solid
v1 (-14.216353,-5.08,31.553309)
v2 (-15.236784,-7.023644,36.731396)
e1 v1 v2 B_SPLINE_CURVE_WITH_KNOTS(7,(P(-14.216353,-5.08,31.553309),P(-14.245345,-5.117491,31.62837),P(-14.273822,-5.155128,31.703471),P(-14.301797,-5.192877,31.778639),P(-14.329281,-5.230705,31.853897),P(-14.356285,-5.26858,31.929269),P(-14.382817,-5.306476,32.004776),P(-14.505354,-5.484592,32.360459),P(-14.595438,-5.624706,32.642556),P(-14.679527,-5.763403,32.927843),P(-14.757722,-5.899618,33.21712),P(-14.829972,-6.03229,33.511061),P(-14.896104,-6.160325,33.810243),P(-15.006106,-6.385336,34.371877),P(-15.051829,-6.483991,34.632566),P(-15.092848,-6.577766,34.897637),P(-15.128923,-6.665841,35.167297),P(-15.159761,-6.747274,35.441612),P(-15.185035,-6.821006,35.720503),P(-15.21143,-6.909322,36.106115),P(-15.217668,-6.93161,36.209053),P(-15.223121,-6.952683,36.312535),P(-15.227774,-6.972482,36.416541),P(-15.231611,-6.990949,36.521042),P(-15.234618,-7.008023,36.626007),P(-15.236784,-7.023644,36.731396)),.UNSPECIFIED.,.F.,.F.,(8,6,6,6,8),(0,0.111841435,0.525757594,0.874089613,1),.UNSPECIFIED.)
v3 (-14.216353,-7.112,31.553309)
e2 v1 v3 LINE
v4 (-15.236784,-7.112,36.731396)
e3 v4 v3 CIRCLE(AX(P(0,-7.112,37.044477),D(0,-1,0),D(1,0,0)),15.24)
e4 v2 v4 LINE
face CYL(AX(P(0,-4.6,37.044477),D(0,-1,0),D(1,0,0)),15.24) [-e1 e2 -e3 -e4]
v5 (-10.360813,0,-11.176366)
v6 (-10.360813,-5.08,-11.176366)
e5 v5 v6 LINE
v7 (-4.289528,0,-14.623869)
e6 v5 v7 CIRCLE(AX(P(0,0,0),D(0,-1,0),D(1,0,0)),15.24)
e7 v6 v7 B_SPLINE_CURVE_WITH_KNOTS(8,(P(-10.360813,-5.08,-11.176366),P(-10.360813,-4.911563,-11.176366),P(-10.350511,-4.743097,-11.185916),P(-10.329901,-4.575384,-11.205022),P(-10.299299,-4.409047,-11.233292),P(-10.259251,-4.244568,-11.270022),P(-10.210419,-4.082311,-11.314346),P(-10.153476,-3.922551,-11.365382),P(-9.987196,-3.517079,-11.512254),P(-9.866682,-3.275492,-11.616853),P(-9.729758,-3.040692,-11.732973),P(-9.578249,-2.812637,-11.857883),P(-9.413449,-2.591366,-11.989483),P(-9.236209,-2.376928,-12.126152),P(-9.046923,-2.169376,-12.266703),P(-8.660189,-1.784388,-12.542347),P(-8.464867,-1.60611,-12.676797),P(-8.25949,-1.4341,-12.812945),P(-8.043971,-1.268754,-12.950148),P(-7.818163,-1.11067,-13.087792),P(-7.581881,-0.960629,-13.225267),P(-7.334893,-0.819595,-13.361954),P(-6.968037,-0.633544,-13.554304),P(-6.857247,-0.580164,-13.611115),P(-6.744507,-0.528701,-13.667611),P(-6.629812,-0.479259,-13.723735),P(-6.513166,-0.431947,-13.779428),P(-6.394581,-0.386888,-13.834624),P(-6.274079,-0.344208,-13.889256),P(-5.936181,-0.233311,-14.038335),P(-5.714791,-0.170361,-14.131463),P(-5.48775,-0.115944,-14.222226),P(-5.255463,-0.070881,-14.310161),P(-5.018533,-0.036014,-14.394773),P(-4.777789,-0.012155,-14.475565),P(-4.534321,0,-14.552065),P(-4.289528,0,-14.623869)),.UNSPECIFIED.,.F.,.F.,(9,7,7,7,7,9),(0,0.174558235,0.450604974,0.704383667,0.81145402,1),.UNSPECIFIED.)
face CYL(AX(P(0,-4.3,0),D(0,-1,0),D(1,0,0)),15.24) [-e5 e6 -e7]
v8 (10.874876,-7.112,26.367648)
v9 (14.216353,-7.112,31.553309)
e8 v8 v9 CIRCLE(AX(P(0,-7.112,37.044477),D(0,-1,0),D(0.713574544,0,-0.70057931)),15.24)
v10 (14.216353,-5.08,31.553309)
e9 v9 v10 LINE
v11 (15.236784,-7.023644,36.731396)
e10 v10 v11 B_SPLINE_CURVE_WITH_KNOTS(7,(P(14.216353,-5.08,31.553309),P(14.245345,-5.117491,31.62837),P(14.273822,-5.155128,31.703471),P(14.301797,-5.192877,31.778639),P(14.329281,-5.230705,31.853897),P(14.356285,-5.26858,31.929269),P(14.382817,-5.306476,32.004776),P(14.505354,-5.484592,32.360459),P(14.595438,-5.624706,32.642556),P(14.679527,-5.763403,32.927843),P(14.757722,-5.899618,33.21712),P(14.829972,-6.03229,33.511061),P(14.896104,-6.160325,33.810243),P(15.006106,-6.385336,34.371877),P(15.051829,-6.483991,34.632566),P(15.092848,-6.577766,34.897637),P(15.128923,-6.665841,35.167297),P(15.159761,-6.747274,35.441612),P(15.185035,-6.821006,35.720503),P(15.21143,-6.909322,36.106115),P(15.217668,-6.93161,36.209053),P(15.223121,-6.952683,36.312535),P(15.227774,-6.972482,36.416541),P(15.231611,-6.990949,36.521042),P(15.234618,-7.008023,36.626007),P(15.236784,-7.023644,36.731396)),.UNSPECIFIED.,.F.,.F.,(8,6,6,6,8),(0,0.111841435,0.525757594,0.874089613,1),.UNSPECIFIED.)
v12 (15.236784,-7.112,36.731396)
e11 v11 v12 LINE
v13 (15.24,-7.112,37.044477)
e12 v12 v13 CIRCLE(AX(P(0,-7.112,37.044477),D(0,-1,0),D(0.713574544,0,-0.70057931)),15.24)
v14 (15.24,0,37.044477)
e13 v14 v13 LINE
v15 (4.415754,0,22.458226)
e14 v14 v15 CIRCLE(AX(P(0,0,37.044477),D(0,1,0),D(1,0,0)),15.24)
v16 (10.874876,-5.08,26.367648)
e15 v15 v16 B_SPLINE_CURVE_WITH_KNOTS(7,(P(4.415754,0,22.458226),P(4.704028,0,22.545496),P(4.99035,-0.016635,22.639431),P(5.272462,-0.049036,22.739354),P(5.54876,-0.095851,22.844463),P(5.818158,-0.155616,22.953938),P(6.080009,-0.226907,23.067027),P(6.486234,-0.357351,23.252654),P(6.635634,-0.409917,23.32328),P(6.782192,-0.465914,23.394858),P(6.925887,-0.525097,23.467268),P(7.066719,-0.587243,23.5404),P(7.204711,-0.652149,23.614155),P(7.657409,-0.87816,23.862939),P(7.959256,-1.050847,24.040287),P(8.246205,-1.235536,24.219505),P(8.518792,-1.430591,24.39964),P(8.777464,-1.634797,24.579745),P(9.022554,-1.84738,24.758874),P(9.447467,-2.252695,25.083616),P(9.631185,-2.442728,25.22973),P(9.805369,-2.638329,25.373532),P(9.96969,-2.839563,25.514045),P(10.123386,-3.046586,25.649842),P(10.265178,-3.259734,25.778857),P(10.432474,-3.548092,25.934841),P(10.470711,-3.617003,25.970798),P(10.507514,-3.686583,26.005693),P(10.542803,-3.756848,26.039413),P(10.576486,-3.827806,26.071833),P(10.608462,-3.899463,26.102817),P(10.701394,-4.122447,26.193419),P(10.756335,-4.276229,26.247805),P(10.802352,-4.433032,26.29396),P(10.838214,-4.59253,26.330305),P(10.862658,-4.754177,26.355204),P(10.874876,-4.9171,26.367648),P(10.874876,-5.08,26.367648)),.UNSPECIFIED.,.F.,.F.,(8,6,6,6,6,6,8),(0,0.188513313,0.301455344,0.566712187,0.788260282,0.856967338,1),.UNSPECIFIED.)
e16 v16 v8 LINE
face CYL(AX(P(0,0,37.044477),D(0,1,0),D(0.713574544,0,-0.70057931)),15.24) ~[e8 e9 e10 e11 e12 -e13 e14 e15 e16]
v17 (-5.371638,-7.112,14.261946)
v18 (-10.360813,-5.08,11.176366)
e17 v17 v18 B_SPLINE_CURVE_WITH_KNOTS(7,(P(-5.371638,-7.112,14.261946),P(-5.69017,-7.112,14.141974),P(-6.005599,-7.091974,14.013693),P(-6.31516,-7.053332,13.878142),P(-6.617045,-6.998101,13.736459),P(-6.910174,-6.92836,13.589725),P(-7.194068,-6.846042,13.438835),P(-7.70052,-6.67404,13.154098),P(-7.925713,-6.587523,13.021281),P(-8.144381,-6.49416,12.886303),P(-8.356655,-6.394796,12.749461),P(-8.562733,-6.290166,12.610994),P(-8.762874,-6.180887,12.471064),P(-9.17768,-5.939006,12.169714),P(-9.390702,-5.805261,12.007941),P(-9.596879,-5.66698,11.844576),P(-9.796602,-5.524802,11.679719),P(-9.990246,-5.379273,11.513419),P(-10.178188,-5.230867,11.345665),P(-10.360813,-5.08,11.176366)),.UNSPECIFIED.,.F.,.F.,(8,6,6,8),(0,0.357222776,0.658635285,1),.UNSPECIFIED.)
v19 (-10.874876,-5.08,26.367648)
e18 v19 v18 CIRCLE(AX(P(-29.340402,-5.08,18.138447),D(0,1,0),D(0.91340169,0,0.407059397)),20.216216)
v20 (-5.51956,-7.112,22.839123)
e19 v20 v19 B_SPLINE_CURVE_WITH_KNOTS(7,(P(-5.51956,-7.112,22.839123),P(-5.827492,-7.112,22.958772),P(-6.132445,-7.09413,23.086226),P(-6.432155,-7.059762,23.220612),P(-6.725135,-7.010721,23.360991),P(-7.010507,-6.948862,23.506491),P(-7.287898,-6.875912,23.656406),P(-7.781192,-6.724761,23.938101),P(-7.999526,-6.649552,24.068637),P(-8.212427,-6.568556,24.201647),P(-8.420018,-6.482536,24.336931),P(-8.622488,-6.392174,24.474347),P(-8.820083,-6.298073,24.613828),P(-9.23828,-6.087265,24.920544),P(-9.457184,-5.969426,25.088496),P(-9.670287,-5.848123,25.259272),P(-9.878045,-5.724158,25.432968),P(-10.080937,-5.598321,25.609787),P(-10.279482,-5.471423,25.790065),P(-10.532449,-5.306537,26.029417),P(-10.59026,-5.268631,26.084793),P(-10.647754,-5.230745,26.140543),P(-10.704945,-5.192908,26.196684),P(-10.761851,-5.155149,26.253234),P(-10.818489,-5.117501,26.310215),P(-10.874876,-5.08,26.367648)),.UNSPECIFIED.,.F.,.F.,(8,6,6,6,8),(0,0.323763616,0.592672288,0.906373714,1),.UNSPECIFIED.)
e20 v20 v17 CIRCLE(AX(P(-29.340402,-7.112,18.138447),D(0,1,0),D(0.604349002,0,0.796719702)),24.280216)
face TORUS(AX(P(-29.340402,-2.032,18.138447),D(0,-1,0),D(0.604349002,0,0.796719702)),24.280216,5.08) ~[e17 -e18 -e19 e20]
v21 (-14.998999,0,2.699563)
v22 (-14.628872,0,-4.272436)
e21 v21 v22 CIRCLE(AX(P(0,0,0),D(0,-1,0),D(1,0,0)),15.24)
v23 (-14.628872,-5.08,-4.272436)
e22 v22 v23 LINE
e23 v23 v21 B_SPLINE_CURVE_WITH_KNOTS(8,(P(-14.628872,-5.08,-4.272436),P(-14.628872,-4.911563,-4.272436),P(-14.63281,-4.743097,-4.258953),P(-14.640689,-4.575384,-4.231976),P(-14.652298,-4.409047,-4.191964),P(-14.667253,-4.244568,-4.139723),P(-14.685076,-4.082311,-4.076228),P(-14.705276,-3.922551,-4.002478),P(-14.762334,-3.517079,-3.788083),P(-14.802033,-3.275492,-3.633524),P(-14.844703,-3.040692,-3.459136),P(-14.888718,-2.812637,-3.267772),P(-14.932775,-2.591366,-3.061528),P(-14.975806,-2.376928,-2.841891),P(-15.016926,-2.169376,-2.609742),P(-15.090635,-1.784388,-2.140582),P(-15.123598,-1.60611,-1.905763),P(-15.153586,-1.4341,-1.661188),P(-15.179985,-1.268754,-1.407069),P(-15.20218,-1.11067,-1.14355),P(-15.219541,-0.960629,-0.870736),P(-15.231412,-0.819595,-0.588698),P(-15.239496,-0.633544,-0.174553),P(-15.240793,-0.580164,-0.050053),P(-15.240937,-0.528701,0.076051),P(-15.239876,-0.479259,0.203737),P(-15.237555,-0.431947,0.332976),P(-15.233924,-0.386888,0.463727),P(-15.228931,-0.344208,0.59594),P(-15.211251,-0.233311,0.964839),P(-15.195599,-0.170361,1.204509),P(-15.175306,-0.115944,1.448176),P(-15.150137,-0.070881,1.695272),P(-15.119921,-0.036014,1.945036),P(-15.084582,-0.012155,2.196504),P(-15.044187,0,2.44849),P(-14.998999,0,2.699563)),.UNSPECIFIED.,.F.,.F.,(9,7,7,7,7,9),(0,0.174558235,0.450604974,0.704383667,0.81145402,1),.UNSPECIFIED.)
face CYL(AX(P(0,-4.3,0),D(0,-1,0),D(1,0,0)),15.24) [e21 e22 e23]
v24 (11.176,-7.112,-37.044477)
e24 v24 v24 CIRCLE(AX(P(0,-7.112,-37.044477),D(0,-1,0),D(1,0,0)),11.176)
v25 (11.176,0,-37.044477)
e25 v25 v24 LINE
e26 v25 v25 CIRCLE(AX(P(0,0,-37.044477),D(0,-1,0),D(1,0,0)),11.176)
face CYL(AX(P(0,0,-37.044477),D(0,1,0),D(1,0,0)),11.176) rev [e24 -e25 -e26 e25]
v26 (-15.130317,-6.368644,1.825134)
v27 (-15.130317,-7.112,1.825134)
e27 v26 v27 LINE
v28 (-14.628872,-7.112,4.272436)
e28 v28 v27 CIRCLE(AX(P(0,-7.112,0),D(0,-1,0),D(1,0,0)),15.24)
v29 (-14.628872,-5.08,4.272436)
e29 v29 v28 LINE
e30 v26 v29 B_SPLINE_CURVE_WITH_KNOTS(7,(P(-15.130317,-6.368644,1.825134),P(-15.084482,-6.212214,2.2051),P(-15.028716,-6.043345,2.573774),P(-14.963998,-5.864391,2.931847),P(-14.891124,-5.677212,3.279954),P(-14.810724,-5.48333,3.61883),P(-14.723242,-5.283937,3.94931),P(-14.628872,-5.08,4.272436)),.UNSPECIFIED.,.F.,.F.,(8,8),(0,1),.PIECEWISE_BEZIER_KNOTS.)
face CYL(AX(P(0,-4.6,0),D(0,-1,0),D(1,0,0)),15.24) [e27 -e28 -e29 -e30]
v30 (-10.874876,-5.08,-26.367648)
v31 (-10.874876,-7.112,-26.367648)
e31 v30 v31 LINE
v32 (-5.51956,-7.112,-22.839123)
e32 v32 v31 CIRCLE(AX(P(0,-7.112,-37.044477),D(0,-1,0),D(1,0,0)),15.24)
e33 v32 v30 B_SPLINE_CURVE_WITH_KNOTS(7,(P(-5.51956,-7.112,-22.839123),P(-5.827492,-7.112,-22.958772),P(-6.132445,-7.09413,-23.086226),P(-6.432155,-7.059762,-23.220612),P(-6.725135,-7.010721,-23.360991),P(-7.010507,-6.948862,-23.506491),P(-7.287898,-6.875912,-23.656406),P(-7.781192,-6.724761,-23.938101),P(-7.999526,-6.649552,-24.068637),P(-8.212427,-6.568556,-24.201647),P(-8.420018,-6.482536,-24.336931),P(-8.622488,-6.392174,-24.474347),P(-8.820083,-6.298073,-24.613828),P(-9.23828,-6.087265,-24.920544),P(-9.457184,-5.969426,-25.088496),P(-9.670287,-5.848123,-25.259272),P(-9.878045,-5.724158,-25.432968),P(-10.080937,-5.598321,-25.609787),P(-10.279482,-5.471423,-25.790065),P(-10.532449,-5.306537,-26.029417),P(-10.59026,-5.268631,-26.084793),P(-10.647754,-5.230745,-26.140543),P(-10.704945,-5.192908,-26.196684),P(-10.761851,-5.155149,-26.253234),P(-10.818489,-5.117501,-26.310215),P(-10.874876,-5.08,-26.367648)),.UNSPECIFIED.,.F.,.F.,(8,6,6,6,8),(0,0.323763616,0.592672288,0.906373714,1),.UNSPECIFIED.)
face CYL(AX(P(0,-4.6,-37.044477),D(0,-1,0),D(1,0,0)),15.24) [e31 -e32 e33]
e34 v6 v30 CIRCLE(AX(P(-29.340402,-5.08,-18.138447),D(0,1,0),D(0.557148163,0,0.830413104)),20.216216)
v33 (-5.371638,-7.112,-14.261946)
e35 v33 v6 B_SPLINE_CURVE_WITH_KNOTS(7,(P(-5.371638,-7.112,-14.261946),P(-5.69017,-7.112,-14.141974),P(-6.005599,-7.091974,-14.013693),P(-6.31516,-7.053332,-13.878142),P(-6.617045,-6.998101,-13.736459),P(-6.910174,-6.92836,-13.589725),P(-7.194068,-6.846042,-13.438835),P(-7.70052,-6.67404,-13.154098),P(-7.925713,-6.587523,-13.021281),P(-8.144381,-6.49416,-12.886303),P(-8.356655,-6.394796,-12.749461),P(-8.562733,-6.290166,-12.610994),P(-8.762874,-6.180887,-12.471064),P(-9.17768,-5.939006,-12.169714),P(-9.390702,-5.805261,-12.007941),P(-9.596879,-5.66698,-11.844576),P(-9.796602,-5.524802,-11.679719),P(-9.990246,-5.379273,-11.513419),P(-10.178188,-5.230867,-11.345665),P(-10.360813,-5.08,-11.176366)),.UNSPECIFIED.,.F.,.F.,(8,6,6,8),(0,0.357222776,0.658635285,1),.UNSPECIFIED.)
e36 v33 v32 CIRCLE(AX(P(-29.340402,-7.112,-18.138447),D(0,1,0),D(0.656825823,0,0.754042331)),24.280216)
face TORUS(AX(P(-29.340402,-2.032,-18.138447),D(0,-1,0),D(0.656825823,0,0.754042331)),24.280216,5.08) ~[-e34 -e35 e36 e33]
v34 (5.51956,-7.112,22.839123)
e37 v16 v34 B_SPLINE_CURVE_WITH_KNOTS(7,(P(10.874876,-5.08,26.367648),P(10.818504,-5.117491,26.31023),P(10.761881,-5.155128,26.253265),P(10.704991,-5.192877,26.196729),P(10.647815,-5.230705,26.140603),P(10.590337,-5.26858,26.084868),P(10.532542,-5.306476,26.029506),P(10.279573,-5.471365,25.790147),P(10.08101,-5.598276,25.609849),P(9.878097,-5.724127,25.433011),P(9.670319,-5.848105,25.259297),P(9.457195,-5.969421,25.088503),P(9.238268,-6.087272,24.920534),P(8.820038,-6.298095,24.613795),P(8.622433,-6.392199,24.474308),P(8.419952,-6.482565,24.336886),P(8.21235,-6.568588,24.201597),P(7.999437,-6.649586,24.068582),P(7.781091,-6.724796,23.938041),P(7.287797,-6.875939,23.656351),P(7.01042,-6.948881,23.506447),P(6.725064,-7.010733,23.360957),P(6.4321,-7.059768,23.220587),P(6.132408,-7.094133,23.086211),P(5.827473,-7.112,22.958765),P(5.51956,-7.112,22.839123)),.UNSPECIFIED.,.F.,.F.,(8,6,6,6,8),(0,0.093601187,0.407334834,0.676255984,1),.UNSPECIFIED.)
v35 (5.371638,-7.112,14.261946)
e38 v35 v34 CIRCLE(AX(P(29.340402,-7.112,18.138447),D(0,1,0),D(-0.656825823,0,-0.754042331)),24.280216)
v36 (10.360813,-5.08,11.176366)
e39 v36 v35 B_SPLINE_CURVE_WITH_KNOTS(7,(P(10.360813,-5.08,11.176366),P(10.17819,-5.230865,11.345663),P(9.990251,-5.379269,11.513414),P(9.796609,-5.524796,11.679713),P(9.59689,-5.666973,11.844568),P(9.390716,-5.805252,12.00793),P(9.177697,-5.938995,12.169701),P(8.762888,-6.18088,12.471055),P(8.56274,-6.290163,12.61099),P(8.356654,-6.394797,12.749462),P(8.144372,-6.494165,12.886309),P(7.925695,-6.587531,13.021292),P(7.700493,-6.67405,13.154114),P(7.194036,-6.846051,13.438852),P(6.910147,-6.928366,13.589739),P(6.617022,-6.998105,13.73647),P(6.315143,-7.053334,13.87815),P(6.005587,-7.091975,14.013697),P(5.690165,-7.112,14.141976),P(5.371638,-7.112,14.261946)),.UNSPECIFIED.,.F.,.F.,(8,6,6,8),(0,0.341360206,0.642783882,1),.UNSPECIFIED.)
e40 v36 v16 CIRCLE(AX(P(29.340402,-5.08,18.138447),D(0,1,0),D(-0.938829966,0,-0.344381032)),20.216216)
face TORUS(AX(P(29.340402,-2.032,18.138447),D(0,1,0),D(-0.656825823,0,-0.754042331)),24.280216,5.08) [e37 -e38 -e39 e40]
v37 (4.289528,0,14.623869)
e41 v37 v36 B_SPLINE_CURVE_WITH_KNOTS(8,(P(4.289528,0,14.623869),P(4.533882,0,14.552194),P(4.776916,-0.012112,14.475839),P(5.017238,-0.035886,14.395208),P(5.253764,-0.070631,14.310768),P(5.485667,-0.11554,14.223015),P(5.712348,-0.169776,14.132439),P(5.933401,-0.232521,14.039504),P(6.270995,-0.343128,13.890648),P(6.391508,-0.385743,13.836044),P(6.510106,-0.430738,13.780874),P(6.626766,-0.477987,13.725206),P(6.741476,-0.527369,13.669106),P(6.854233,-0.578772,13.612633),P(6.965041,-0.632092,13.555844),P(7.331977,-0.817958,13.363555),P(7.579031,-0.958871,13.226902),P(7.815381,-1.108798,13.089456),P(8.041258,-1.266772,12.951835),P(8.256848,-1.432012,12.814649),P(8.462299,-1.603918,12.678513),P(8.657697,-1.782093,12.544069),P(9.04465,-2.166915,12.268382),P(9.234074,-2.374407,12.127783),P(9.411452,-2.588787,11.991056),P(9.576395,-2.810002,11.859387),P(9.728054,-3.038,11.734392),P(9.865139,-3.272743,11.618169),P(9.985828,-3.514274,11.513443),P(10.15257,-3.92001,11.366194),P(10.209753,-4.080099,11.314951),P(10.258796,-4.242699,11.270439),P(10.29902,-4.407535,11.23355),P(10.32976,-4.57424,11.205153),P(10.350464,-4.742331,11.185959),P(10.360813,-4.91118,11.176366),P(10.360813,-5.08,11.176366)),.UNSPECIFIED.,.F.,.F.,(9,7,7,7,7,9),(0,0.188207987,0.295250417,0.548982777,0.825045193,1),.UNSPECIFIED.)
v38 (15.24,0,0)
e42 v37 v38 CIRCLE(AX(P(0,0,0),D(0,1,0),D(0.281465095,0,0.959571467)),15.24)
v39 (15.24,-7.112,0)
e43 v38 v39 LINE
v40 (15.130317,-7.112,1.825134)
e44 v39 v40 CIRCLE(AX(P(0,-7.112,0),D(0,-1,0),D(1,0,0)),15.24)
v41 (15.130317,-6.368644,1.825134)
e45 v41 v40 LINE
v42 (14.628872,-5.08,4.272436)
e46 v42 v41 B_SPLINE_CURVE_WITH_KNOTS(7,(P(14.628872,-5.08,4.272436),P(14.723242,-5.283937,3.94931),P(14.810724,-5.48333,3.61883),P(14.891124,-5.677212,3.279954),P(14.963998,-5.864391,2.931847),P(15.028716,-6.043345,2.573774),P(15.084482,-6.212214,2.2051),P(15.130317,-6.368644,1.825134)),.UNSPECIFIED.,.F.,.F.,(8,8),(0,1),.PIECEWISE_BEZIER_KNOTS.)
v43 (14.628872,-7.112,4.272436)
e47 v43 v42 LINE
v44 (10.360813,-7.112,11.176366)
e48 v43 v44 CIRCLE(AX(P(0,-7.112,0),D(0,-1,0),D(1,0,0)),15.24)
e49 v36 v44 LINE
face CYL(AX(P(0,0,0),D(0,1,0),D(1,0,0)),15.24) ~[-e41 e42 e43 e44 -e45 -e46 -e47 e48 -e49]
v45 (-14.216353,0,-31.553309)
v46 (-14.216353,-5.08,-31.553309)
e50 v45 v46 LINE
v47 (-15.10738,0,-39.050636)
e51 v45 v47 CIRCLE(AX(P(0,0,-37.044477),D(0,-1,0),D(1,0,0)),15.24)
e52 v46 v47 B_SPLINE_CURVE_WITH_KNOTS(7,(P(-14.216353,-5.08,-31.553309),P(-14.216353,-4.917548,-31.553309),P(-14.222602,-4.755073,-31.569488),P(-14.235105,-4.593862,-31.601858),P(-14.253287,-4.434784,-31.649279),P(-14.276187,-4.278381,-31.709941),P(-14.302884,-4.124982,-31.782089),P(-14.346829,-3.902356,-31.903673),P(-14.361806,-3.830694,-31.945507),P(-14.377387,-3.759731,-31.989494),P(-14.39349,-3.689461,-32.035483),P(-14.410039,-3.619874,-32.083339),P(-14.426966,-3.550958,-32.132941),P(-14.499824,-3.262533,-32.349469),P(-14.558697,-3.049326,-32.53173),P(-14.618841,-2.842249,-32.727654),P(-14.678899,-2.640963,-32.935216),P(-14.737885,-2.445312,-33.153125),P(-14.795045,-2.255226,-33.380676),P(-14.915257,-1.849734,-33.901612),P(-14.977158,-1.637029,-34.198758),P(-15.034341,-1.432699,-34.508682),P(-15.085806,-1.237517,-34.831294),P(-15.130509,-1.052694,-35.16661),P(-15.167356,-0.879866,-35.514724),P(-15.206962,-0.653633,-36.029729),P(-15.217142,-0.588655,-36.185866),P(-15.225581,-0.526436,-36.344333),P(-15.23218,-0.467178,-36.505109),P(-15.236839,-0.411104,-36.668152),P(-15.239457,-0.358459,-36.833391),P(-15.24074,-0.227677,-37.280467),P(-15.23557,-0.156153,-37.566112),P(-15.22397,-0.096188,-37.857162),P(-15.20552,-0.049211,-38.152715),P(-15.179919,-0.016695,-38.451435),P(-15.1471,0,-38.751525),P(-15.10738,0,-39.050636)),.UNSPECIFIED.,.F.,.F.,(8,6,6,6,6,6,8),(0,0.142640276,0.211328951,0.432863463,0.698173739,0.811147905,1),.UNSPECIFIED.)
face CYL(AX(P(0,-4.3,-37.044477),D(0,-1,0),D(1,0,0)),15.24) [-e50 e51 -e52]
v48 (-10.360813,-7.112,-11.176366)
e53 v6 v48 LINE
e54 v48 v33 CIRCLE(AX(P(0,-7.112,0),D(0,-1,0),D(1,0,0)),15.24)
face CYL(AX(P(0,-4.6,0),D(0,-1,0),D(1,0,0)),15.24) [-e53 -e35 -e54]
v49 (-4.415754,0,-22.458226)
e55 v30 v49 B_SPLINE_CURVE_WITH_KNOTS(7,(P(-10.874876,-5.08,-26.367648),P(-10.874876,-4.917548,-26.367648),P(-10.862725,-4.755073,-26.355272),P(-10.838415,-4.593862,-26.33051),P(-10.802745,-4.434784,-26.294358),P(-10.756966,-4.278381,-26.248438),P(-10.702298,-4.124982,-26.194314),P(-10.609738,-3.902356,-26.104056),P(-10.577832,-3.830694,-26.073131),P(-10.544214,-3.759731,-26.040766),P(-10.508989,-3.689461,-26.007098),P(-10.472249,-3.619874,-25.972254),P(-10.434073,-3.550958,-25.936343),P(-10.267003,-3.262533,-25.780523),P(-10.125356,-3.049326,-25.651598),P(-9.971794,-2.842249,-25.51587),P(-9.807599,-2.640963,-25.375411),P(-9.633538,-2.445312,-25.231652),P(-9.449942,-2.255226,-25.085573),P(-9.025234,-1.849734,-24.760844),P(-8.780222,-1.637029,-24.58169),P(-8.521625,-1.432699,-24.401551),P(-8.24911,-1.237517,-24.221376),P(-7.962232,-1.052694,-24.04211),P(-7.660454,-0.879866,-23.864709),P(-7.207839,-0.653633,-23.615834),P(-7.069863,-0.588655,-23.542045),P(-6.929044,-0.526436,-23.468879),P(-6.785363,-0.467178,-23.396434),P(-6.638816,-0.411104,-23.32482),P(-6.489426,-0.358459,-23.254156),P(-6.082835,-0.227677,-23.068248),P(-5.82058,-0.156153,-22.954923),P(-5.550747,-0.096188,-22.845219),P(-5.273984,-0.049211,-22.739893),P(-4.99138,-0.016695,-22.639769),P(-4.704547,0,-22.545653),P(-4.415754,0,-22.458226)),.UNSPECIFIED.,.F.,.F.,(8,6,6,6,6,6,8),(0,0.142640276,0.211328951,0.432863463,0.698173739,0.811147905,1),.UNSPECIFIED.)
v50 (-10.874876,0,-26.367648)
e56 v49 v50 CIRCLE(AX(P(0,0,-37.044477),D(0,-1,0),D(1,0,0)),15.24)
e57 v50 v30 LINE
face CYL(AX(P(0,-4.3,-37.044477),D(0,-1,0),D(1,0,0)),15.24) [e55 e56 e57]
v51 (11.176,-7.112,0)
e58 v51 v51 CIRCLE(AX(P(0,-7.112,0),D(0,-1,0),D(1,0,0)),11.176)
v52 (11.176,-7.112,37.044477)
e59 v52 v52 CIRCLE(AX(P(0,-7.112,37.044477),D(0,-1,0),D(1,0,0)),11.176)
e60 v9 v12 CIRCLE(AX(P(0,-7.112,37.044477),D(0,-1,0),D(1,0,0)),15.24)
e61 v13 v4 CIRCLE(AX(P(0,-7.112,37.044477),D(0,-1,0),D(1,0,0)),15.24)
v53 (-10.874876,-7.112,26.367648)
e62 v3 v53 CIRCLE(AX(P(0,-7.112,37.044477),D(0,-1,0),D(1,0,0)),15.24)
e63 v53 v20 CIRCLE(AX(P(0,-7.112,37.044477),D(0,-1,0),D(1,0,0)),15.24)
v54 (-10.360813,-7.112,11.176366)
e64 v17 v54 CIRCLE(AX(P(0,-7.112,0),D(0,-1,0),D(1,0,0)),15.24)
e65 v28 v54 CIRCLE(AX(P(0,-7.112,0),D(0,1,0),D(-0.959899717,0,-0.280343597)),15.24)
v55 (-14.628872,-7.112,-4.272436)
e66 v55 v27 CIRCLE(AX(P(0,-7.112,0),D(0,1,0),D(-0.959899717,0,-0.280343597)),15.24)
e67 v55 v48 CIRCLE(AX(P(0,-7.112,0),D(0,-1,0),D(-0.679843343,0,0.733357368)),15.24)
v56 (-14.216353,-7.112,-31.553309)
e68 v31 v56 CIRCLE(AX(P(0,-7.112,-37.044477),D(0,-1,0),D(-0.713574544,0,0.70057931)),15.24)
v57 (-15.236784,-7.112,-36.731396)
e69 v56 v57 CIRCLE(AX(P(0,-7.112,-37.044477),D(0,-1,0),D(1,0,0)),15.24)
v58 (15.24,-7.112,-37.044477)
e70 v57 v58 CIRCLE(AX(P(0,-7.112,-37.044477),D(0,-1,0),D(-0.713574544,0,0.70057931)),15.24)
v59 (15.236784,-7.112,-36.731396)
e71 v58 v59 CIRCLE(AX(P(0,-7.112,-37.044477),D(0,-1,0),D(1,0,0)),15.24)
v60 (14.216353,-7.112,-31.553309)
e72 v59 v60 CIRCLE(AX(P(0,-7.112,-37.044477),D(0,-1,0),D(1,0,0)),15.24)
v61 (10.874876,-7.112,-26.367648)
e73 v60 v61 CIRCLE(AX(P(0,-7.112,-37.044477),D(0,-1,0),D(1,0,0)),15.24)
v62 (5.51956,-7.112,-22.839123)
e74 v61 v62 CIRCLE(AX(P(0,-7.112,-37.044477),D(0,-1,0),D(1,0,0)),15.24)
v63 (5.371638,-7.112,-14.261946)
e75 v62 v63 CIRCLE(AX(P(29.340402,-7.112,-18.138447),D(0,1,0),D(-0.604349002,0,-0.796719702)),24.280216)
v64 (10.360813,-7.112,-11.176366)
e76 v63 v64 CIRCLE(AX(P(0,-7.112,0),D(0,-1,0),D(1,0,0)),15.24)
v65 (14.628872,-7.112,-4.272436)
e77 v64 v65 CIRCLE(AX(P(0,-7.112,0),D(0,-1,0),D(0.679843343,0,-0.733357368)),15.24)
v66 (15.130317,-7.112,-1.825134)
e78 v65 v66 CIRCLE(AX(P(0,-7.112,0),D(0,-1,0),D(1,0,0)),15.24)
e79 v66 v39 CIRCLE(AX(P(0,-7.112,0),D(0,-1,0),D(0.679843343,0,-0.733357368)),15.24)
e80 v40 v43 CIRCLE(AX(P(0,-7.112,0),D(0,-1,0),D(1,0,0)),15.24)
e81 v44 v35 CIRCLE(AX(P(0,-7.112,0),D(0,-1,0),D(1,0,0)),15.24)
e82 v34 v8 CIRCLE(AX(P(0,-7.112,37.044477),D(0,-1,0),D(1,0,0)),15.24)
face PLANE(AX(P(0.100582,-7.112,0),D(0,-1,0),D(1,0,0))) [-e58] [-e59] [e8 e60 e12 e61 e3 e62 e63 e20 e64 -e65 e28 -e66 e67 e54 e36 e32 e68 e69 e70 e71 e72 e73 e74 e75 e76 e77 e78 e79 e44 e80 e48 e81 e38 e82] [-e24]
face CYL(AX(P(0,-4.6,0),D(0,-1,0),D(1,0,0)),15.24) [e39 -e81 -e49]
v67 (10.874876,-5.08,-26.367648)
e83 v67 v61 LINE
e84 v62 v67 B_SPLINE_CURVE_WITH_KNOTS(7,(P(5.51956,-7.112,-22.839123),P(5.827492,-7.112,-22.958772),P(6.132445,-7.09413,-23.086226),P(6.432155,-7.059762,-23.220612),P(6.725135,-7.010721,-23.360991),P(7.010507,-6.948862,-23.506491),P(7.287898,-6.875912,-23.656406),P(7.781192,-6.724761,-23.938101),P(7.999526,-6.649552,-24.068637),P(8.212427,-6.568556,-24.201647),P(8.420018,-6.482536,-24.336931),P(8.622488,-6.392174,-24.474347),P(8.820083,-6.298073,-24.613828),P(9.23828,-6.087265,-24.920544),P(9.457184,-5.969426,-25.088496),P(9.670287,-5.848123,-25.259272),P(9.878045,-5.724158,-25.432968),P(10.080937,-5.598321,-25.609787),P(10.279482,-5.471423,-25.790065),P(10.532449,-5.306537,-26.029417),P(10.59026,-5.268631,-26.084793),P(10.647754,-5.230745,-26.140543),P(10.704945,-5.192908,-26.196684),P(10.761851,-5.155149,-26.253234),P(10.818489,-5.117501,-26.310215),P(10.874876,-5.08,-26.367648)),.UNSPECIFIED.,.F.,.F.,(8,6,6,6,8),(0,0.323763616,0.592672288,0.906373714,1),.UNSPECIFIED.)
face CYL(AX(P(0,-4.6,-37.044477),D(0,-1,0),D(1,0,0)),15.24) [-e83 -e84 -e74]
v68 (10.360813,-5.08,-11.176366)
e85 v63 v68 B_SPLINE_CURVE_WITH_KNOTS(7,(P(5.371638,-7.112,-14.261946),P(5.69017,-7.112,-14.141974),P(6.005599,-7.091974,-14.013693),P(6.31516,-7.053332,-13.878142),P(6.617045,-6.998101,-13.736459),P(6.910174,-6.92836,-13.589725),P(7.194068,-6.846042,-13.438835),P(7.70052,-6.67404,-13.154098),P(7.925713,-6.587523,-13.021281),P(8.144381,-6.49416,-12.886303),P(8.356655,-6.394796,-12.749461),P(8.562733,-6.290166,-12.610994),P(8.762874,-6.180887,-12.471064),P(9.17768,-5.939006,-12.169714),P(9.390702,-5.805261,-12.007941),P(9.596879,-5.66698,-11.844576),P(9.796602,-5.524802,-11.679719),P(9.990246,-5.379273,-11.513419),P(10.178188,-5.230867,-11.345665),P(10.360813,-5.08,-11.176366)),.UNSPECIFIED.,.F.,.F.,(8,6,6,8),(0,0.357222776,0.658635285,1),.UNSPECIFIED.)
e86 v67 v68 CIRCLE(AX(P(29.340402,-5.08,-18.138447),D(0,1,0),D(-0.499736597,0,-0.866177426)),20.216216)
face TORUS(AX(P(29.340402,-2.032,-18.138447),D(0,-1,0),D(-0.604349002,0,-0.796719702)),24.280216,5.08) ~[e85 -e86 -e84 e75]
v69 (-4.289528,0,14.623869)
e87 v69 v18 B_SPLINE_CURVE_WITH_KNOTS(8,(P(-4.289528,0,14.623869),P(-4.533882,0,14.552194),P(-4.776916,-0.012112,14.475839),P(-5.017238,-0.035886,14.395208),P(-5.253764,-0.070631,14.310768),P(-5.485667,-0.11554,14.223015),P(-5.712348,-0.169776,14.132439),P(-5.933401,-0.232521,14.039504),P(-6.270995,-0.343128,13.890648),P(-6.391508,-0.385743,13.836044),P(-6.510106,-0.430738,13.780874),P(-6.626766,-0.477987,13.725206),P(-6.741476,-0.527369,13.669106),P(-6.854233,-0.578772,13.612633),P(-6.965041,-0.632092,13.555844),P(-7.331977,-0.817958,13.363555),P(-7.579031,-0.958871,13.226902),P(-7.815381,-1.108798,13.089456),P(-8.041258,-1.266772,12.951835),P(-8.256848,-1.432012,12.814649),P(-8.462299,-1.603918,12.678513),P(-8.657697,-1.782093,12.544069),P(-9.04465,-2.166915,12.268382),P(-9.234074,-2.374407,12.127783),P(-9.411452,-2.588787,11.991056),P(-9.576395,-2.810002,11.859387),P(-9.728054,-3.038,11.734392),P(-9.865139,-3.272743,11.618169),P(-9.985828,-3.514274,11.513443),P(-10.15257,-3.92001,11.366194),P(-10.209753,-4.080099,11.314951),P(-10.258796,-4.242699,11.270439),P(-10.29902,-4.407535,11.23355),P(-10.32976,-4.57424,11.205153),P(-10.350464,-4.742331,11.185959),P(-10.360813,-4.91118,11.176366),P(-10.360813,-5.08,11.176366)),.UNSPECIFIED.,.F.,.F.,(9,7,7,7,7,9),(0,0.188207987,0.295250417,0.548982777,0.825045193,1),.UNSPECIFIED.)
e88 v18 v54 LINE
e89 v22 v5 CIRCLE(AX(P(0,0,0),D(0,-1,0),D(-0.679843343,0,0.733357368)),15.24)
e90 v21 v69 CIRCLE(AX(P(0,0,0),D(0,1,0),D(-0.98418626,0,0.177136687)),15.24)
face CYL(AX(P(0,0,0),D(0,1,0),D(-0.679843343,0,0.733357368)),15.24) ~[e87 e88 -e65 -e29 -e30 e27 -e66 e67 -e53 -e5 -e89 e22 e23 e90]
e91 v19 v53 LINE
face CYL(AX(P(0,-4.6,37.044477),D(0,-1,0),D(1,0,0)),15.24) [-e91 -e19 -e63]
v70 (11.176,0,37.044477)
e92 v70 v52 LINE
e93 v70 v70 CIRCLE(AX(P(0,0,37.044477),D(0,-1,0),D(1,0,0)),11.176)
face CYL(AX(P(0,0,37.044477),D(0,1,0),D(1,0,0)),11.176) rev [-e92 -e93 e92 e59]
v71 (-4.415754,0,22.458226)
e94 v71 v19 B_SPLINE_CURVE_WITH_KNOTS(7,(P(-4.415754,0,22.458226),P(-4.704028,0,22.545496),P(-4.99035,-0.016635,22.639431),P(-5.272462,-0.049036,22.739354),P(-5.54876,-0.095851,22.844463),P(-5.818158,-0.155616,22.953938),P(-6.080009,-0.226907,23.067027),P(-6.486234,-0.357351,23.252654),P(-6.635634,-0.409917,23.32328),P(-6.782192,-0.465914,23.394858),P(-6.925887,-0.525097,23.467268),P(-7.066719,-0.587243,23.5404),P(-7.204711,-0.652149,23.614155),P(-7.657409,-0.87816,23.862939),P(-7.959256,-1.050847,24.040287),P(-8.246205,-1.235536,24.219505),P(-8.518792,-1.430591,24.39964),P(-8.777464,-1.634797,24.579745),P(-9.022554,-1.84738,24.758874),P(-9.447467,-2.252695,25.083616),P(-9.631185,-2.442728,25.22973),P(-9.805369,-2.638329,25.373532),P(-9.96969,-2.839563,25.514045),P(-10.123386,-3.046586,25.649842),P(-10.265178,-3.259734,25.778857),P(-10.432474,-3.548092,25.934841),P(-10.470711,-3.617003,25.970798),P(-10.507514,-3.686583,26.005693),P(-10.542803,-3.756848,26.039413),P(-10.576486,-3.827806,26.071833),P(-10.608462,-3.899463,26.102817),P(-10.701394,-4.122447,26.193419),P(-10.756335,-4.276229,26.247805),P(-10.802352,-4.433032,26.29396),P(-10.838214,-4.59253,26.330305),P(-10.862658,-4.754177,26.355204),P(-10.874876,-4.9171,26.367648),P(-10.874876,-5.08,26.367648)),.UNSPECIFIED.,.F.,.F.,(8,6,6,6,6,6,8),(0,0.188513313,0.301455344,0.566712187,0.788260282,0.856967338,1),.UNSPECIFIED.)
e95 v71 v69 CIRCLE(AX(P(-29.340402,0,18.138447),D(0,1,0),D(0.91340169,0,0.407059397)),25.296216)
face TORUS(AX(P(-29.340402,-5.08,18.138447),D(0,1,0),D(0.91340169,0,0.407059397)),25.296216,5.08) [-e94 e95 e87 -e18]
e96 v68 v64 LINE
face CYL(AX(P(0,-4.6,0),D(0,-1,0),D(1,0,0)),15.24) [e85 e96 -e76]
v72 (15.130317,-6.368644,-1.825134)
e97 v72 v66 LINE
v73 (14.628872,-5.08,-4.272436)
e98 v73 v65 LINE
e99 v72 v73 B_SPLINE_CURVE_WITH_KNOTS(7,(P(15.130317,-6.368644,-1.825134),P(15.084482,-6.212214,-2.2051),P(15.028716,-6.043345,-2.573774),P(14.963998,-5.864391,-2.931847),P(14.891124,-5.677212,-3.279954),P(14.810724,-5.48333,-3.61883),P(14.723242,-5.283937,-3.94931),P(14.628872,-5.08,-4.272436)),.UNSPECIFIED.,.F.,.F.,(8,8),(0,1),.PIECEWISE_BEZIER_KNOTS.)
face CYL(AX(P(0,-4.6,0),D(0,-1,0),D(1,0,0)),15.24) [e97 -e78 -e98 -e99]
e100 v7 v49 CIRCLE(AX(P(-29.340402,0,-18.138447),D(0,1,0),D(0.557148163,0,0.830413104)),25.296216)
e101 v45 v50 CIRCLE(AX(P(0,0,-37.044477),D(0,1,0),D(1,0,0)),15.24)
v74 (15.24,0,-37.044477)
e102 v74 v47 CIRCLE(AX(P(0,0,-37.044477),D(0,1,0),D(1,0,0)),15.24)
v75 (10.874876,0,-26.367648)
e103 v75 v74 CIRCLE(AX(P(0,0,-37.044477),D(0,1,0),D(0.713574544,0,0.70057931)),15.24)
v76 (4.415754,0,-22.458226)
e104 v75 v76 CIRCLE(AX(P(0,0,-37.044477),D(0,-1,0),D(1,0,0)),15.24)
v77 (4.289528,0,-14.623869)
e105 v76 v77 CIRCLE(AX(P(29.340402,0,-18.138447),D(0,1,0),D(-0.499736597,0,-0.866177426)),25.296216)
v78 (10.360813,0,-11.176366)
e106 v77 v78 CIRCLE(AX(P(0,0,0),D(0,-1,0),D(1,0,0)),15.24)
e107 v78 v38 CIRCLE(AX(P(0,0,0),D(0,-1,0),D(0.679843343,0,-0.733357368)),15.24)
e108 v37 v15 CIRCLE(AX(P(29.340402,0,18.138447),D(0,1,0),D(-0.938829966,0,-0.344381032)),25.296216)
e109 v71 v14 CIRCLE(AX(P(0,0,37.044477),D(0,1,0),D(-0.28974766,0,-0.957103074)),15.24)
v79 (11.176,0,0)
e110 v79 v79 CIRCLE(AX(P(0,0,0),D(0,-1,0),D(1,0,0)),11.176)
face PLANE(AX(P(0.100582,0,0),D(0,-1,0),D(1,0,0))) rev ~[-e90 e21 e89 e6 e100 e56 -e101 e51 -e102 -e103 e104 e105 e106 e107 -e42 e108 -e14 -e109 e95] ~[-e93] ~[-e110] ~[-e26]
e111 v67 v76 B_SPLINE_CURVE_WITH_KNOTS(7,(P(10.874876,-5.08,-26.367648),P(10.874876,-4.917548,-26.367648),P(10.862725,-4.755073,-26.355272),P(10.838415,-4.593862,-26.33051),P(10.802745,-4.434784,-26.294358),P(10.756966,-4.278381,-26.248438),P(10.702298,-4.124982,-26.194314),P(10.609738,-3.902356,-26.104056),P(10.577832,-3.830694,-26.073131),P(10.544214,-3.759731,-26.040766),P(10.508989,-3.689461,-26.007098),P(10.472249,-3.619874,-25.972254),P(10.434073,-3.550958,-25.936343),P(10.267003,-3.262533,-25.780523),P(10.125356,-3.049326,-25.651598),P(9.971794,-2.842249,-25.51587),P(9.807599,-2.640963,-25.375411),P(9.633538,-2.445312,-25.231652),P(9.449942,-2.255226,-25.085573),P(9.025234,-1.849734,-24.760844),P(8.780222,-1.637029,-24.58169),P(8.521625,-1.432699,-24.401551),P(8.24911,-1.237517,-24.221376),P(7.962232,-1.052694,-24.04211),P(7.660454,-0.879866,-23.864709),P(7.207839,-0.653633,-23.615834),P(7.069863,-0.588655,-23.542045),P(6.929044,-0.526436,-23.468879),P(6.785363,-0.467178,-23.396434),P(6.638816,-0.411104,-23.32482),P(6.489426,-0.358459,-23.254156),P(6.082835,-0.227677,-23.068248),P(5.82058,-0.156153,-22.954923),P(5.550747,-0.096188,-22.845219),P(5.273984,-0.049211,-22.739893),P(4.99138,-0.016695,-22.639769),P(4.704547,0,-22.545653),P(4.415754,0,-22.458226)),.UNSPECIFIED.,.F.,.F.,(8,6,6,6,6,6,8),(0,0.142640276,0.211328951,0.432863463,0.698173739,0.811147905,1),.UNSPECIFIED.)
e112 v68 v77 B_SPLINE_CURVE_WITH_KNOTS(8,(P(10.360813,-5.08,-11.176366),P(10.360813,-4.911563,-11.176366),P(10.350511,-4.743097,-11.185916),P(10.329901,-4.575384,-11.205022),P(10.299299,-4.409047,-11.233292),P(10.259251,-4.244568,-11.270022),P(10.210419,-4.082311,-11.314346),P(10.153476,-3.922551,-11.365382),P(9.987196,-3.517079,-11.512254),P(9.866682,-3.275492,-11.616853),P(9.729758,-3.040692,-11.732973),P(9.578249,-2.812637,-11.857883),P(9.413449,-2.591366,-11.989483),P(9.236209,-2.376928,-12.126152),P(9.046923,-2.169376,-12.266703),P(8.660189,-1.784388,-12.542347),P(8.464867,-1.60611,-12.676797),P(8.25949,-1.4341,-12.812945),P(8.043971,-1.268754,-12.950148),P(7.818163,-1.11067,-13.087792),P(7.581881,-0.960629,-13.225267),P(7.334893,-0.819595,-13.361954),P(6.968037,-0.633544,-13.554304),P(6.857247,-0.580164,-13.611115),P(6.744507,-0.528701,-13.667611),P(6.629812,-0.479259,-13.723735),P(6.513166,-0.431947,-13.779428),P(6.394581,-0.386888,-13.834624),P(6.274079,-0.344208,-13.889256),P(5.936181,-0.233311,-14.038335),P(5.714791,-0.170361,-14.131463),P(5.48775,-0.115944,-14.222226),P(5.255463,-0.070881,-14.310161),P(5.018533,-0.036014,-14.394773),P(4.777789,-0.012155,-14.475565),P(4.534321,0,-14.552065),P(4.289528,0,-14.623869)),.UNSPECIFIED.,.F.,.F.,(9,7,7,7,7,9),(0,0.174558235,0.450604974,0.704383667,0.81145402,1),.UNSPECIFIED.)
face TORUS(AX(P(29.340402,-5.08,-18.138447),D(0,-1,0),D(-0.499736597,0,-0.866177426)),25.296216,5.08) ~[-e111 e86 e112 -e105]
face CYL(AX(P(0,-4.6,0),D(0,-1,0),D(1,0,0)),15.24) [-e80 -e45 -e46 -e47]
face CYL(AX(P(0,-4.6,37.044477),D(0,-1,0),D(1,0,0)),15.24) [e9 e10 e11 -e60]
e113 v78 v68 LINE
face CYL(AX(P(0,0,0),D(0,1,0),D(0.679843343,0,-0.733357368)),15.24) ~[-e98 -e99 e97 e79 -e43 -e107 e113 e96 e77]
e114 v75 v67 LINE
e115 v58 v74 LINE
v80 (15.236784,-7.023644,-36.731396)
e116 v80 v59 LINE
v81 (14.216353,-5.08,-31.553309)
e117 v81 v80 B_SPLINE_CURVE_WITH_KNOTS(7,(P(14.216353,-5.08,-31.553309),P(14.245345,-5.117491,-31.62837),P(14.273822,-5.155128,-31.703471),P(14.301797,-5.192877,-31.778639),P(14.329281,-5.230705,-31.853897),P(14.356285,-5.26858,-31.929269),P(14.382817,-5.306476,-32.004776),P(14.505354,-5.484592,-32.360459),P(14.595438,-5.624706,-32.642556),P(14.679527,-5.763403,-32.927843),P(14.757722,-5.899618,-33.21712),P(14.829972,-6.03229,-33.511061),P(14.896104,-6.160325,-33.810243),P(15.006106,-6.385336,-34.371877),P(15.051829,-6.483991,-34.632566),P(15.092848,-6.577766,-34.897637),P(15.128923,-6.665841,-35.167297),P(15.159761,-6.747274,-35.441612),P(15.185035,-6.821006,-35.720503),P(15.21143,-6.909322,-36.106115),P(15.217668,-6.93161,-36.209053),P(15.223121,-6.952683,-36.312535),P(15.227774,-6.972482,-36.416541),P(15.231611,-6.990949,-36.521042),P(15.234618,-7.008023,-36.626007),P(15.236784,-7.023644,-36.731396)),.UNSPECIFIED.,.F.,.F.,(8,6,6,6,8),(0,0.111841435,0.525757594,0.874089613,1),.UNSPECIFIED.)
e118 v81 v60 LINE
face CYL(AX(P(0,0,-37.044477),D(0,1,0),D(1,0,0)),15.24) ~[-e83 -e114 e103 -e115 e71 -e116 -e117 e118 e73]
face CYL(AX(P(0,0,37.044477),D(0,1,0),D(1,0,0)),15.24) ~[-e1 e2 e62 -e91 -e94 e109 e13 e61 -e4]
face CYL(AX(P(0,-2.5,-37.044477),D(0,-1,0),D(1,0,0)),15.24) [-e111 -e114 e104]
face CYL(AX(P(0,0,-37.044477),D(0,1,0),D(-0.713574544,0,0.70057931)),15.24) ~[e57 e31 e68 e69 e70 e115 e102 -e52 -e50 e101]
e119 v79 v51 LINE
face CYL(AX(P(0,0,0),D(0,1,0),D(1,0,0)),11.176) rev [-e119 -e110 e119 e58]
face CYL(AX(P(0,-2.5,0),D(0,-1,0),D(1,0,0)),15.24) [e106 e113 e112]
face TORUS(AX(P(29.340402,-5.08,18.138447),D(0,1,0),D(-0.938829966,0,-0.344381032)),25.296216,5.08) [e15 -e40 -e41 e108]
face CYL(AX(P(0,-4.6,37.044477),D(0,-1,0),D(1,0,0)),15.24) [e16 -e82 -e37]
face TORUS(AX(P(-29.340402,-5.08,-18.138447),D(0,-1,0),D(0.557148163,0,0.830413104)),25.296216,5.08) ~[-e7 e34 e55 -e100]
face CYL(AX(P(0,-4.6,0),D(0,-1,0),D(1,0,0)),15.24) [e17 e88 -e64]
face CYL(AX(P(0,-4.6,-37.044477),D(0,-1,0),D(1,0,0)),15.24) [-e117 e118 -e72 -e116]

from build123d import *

# Parameters (mm, degrees)
F0_R         = 11.176
F1_DEPTH     = 7.112
F2_T4_ANGLE  = 116.1586222886
F2_S5_R      = 15.24
F2_T6_DEPTH  = 30
F2_S7_R      = 15.24
F2_T8_DEPTH  = 30
F2_T12_ANGLE = 116.1586222886
F2_S13_R     = 15.24
F2_T14_DEPTH = 30
F2_S15_R     = 15.24
F2_T16_DEPTH = 30
F3_R         = 5.08
F4_T4_ANGLE  = 101.759749901
F4_S5_R      = 15.24
F4_T6_DEPTH  = 23
F4_S7_R      = 15.24
F4_T8_DEPTH  = 23
F4_T12_ANGLE = 101.7597499017
F4_S13_R     = 15.24
F4_T14_DEPTH = 27
F4_S15_R     = 15.24
F4_T16_DEPTH = 27
F4_T20_ANGLE = 101.7597499014
F4_S21_R     = 15.24
F4_T22_DEPTH = 27
F4_S23_R     = 15.24
F4_T24_DEPTH = 27
F4_T28_ANGLE = 101.7597499014
F4_S29_R     = 15.24
F4_T30_DEPTH = 27
F4_S31_R     = 15.24
F4_T32_DEPTH = 27


# Not quite as in the source:
# - a fillet or chamfer that OpenCascade refuses, or shapes differently, is made with other operations: its cross-section is extruded or revolved along the edge and cut away or added


with BuildPart() as f1:
    # F0 (on Front) → F1 (new body)
    with BuildSketch(Plane.XZ):
        with BuildLine():
            ThreePointArc((10.3608125449, -11.1763662883), (13.9670394713, -6.0974919769), (15.24, 0))
            ThreePointArc((15.24, 0), (13.9670394713, 6.0974919769), (10.3608125449, 11.1763662883))
            ThreePointArc((10.3608125449, 11.1763662883), (0, 15.24), (-10.3608125449, 11.1763662883))
            ThreePointArc((-10.3608125449, 11.1763662883), (-15.24, 0), (-10.3608125449, -11.1763662883))
            ThreePointArc((-10.3608125449, -11.1763662883), (0, -15.24), (10.3608125449, -11.1763662883))
        make_face()
        Circle(F0_R, mode=Mode.SUBTRACT)
        with BuildLine():
            ThreePointArc((-10.3608125449, 11.1763662883), (0, 15.24), (10.3608125449, 11.1763662883))
            ThreePointArc((10.3608125449, 11.1763662883), (9.1357508424, 18.8221602784), (10.8748760535, 26.3676480303))
            ThreePointArc((10.8748760535, 26.3676480303), (0, 21.8044767177), (-10.8748760535, 26.3676480303))
            ThreePointArc((-10.8748760535, 26.3676480303), (-9.1357508424, 18.8221602784), (-10.3608125449, 11.1763662883))
        make_face()
        with BuildLine():
            ThreePointArc((10.8748760535, -26.3676480303), (9.1357508424, -18.8221602784), (10.3608125449, -11.1763662883))
            ThreePointArc((10.3608125449, -11.1763662883), (0, -15.24), (-10.3608125449, -11.1763662883))
            ThreePointArc((-10.3608125449, -11.1763662883), (-9.1357508424, -18.8221602784), (-10.8748760535, -26.3676480303))
            ThreePointArc((-10.8748760535, -26.3676480303), (0, -21.8044767177), (10.8748760535, -26.3676480303))
        make_face()
        with BuildLine():
            ThreePointArc((-10.8748760535, 26.3676480303), (0, 21.8044767177), (10.8748760535, 26.3676480303))
            ThreePointArc((10.8748760535, 26.3676480303), (14.1065713598, 31.2771337877), (15.24, 37.0444767177))
            ThreePointArc((15.24, 37.0444767177), (-5.76734293, 51.1510480775), (-10.8748760535, 26.3676480303))
        make_face()
        with Locations((0, 37.0444767177)):
            Circle(F0_R, mode=Mode.SUBTRACT)
        with BuildLine():
            ThreePointArc((15.24, -37.0444767177), (14.1065713598, -31.2771337877), (10.8748760535, -26.3676480303))
            ThreePointArc((10.8748760535, -26.3676480303), (0, -21.8044767177), (-10.8748760535, -26.3676480303))
            ThreePointArc((-10.8748760535, -26.3676480303), (-5.76734293, -51.1510480775), (15.24, -37.0444767177))
        make_face()
        with Locations((0, -37.0444767177)):
            Circle(F0_R, mode=Mode.SUBTRACT)
    extrude(amount=F1_DEPTH)

    # F2: fillet of radius 5.08 on 2 edges, made by hand


with BuildPart() as f2_tool2:
    # F2_s3 → F2_t4 (revolve)
    with BuildSketch(Plane(origin=(29.8644460088, 0, -17.2301380427), x_dir=(0, 1, 0), z_dir=(0.8661774261, 0, -0.4997365971))):
        with BuildLine():
            ThreePointArc((-5.08, -21.2648569422), (-1.4878975516, -22.7527544938), (0, -26.3448569422))
            Line((0, -26.3448569422), (0, -21.2648569422))
            Line((0, -21.2648569422), (-5.08, -21.2648569422))
        make_face()
    revolve(axis=Axis((29.340401561, 0, -18.1384474874), (0, 1, 0)), revolution_arc=F2_T4_ANGLE)

    # F2_s5 → F2_t6 (cut, symmetric)
    with BuildSketch(Plane.XZ.offset(2.5)):
        with Locations((0, -37.0444767177)):
            Circle(F2_S5_R)
    extrude(amount=F2_T6_DEPTH, both=True, mode=Mode.SUBTRACT)

    # F2_s7 → F2_t8 (cut, symmetric)
    with BuildSketch(Plane.XZ.offset(2.5)):
        Circle(F2_S7_R)
    extrude(amount=F2_T8_DEPTH, both=True, mode=Mode.SUBTRACT)


with BuildPart() as f1_1:
    add(f1.part)

    # F2_t1: cut F2_tool2
    add(f2_tool2.part, mode=Mode.SUBTRACT)


with BuildPart() as f2_tool10:
    # F2_s11 → F2_t12 (revolve)
    with BuildSketch(Plane(origin=(-11.8407369211, 0, 7.9442927806), x_dir=(0, 1, 0), z_dir=(-0.8304131044, 0, 0.5571481635))):
        with BuildLine():
            ThreePointArc((-5.08, 11.1931397161), (-1.4878975516, 9.7052421646), (0, 6.1131397161))
            Line((0, 6.1131397161), (0, 11.1931397161))
            Line((0, 11.1931397161), (-5.08, 11.1931397161))
        make_face()
    revolve(axis=Axis((-29.340401561, 0, -18.1384474874), (0, 1, 0)), revolution_arc=F2_T12_ANGLE)

    # F2_s13 → F2_t14 (cut, symmetric)
    with BuildSketch(Plane.XZ.offset(4.3)):
        Circle(F2_S13_R)
    extrude(amount=F2_T14_DEPTH, both=True, mode=Mode.SUBTRACT)

    # F2_s15 → F2_t16 (cut, symmetric)
    with BuildSketch(Plane.XZ.offset(4.3)):
        with Locations((0, -37.0444767177)):
            Circle(F2_S15_R)
    extrude(amount=F2_T16_DEPTH, both=True, mode=Mode.SUBTRACT)


with BuildPart() as f1_2:
    add(f1_1.part)

    # F2_t9: cut F2_tool10
    add(f2_tool10.part, mode=Mode.SUBTRACT)

    # F3#2 (call 1 of 2: OpenCascade refuses the feature's edges together)
    f3_2_edges = [f1_2.edges().sort_by_distance(p)[0] for p in [
        (-9.135751, 0, 18.82216),
    ]]
    fillet(f3_2_edges, radius=F3_R)

    # F3 (call 2 of 2)
    f3_edges = [f1_2.edges().sort_by_distance(p)[0] for p in [
        (9.135751, 0, 18.82216),
    ]]
    fillet(f3_edges, radius=F3_R)

    # F4: fillet of radius 5.08 on 4 edges, made by hand


with BuildPart() as f4_tool2:
    # F4_s3 → F4_t4 (revolve)
    with BuildSketch(Plane(origin=(27.3577839274, 0, -20.7521533482), x_dir=(0, 1, 0), z_dir=(0.7967197018, 0, -0.6043490025))):
        with BuildLine():
            ThreePointArc((-7.112, -20.9996316731), (-6.5756901303, -18.727786608), (-5.08, -16.9356316731))
            Line((-5.08, -16.9356316731), (-7.112, -16.9356316732))
            Line((-7.112, -16.9356316732), (-7.112, -20.9996316731))
        make_face()
    revolve(axis=Axis((29.340401561, -7.112, -18.1384474874), (0, 1, 0)), revolution_arc=F4_T4_ANGLE)

    # F4_s5 → F4_t6 (cut, symmetric)
    with BuildSketch(Plane.XZ.offset(4.6)):
        Circle(F4_S5_R)
    extrude(amount=F4_T6_DEPTH, both=True, mode=Mode.SUBTRACT)

    # F4_s7 → F4_t8 (cut, symmetric)
    with BuildSketch(Plane.XZ.offset(4.6)):
        with Locations((0, -37.0444767177)):
            Circle(F4_S7_R)
    extrude(amount=F4_T8_DEPTH, both=True, mode=Mode.SUBTRACT)


with BuildPart() as f1_3:
    add(f1_2.part)

    # F4_t1: cut F4_tool2
    add(f4_tool2.part, mode=Mode.SUBTRACT)


with BuildPart() as f4_tool10:
    # F4_s11 → F4_t12 (revolve)
    with BuildSketch(Plane(origin=(-7.6988506956, 0, 6.7062600285), x_dir=(0, 1, 0), z_dir=(-0.7540423315, 0, 0.6568258234))):
        with BuildLine():
            ThreePointArc((-7.112, 8.6684750316), (-6.5756901303, 10.9403200968), (-5.08, 12.7324750316))
            Line((-5.08, 12.7324750316), (-7.112, 12.7324750316))
            Line((-7.112, 12.7324750316), (-7.112, 8.6684750316))
        make_face()
    revolve(axis=Axis((-29.340401561, -7.112, -18.1384474874), (0, 1, 0)), revolution_arc=F4_T12_ANGLE)

    # F4_s13 → F4_t14 (cut, symmetric)
    with BuildSketch(Plane.XZ.offset(4.6)):
        with Locations((0, -37.0444767177)):
            Circle(F4_S13_R)
    extrude(amount=F4_T14_DEPTH, both=True, mode=Mode.SUBTRACT)

    # F4_s15 → F4_t16 (cut, symmetric)
    with BuildSketch(Plane.XZ.offset(4.6)):
        Circle(F4_S15_R)
    extrude(amount=F4_T16_DEPTH, both=True, mode=Mode.SUBTRACT)


with BuildPart() as f1_4:
    add(f1_3.part)

    # F4_t9: cut F4_tool10
    add(f4_tool10.part, mode=Mode.SUBTRACT)


with BuildPart() as f4_tool18:
    # F4_s19 → F4_t20 (revolve)
    with BuildSketch(Plane(origin=(-27.3577839275, 0, 20.7521533481), x_dir=(0, 1, 0), z_dir=(-0.7967197018, 0, 0.6043490025))):
        with BuildLine():
            ThreePointArc((-7.112, -20.9996316733), (-6.5756901303, -18.7277866081), (-5.08, -16.9356316733))
            Line((-5.08, -16.9356316733), (-7.112, -16.9356316733))
            Line((-7.112, -16.9356316733), (-7.112, -20.9996316733))
        make_face()
    revolve(axis=Axis((-29.340401561, -7.112, 18.1384474874), (0, 1, 0)), revolution_arc=F4_T20_ANGLE)

    # F4_s21 → F4_t22 (cut, symmetric)
    with BuildSketch(Plane.XZ.offset(4.6)):
        with Locations((0, 37.0444767177)):
            Circle(F4_S21_R)
    extrude(amount=F4_T22_DEPTH, both=True, mode=Mode.SUBTRACT)

    # F4_s23 → F4_t24 (cut, symmetric)
    with BuildSketch(Plane.XZ.offset(4.6)):
        Circle(F4_S23_R)
    extrude(amount=F4_T24_DEPTH, both=True, mode=Mode.SUBTRACT)


with BuildPart() as f1_5:
    add(f1_4.part)

    # F4_t17: cut F4_tool18
    add(f4_tool18.part, mode=Mode.SUBTRACT)


with BuildPart() as f4_tool26:
    # F4_s27 → F4_t28 (revolve)
    with BuildSketch(Plane(origin=(7.6988506955, 0, -6.7062600285), x_dir=(0, 1, 0), z_dir=(0.7540423315, 0, -0.6568258234))):
        with BuildLine():
            ThreePointArc((-5.08, 12.7324750317), (-6.5756901303, 10.9403200968), (-7.112, 8.6684750317))
            Line((-7.112, 8.6684750317), (-7.112, 12.7324750317))
            Line((-7.112, 12.7324750317), (-5.08, 12.7324750317))
        make_face()
    revolve(axis=Axis((29.340401561, -7.112, 18.1384474874), (0, 1, 0)), revolution_arc=F4_T28_ANGLE)

    # F4_s29 → F4_t30 (cut, symmetric)
    with BuildSketch(Plane.XZ.offset(4.6)):
        Circle(F4_S29_R)
    extrude(amount=F4_T30_DEPTH, both=True, mode=Mode.SUBTRACT)

    # F4_s31 → F4_t32 (cut, symmetric)
    with BuildSketch(Plane.XZ.offset(4.6)):
        with Locations((0, 37.0444767177)):
            Circle(F4_S31_R)
    extrude(amount=F4_T32_DEPTH, both=True, mode=Mode.SUBTRACT)


with BuildPart() as f1_6:
    add(f1_5.part)

    # F4_t25: cut F4_tool26
    add(f4_tool26.part, mode=Mode.SUBTRACT)


solid = f1_6.part
